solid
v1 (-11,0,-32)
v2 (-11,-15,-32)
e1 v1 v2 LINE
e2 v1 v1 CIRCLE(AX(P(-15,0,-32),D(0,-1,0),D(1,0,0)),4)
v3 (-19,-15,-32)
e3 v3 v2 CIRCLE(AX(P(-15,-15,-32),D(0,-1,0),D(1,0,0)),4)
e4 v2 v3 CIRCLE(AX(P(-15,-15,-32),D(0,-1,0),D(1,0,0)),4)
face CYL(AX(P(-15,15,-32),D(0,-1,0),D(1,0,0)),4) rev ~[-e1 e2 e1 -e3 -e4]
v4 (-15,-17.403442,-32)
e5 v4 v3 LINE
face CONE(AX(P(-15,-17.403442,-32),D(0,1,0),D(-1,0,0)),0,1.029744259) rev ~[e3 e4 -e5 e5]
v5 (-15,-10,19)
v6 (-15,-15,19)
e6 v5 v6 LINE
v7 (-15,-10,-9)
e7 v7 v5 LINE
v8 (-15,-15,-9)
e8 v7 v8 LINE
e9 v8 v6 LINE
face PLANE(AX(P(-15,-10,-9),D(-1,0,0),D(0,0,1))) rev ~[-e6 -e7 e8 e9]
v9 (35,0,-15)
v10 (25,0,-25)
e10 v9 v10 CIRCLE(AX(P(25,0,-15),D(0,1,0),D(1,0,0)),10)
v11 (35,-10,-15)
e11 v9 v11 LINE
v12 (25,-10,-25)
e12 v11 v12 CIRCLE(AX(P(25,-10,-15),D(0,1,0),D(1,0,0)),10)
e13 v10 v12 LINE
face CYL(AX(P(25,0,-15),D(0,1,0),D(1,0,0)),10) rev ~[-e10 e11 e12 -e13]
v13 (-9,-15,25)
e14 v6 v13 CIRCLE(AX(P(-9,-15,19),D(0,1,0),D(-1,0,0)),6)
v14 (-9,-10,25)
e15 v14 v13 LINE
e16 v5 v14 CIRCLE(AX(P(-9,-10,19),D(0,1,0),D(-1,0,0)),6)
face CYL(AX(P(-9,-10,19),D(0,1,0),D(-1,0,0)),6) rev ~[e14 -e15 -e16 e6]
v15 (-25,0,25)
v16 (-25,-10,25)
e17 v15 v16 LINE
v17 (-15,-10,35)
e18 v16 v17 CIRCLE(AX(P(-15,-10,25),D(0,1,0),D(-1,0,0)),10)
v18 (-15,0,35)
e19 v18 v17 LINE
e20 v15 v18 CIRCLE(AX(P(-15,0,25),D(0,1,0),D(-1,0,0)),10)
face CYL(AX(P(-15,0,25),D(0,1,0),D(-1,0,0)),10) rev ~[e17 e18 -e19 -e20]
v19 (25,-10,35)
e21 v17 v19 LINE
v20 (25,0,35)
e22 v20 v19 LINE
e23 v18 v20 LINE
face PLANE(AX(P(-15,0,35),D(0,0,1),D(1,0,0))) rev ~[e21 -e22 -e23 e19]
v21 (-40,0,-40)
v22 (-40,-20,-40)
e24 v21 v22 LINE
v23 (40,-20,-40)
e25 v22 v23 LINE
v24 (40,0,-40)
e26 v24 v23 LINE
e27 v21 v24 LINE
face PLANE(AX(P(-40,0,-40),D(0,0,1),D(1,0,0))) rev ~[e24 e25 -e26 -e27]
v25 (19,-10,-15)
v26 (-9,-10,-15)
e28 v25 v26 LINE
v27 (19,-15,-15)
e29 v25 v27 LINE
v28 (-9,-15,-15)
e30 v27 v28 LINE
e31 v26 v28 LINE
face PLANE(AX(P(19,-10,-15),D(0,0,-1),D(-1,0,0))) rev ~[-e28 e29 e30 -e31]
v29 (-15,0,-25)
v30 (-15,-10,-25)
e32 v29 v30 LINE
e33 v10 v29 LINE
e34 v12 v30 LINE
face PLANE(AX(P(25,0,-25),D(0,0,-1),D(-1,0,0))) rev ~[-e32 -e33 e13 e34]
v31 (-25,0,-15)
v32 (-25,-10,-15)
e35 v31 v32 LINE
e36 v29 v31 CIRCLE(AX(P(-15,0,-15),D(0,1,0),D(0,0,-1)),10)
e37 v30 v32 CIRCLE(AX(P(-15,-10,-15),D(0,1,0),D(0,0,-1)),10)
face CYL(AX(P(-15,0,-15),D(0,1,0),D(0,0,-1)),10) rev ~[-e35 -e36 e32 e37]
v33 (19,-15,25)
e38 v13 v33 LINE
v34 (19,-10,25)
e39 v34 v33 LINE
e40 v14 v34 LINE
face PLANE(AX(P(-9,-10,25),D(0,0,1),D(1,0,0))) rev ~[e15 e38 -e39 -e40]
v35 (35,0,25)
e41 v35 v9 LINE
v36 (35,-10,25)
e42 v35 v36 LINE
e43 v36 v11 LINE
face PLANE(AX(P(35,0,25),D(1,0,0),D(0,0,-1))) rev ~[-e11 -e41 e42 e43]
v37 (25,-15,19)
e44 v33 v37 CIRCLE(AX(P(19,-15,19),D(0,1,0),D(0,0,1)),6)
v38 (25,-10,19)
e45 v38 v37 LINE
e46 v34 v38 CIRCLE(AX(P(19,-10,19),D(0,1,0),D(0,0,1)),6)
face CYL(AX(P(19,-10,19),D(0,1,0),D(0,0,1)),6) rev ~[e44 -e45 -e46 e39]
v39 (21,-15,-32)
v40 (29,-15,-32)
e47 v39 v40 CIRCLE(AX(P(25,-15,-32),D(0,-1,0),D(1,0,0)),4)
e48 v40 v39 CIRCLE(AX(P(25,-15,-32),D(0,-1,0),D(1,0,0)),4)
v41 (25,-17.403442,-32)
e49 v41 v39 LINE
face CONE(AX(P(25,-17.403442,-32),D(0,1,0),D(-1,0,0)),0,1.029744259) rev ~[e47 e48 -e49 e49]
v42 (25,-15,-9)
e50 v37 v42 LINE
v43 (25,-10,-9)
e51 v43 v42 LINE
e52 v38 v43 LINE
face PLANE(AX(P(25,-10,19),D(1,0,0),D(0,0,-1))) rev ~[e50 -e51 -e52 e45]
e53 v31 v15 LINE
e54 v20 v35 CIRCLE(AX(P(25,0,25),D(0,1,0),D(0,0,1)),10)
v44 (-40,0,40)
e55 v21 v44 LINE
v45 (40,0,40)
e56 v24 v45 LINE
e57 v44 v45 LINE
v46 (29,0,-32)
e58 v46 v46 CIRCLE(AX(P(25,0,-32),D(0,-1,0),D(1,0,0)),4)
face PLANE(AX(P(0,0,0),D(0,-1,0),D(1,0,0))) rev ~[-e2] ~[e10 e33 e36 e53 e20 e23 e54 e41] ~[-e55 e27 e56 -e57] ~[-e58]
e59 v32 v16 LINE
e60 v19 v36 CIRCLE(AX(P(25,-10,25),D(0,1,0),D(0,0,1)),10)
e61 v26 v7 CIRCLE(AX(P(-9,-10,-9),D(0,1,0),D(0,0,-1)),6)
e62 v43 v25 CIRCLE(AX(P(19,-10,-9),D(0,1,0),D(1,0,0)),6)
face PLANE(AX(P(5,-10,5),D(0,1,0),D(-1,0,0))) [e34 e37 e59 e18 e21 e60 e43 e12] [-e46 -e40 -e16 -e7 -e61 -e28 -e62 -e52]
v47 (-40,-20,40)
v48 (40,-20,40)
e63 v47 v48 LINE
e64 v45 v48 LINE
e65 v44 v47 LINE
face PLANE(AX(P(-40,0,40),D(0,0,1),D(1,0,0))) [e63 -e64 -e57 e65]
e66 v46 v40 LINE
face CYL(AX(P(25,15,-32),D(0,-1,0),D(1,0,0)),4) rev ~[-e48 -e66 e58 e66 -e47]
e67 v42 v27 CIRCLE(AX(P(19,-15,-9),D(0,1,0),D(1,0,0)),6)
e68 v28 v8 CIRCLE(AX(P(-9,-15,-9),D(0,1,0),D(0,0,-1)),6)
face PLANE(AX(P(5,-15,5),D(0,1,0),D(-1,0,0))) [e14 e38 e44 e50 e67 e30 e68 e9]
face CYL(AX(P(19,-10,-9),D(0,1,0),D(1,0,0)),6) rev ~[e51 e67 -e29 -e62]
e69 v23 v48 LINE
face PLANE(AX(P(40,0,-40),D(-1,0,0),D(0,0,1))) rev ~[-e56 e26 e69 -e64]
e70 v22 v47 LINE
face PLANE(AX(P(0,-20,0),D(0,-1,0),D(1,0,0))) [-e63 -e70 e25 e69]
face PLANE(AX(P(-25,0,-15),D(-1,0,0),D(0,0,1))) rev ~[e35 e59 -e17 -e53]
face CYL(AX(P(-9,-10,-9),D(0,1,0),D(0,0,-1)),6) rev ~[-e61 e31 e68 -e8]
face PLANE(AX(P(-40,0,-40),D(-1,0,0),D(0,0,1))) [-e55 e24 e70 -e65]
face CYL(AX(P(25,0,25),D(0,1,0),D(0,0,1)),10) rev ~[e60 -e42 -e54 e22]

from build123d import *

# Parameters (mm, degrees)
F0_W     = 80
F0_H     = 80
F1_DEPTH = 20
F3_DEPTH = 10
F5_DEPTH = 5
F7_D     = 8
F7_DEPTH = 15
F7_TIP   = 2.4034424761


with BuildPart() as f1:
    # F0 (on Front) → F1 (new body)
    with BuildSketch(Plane.XZ):
        Rectangle(F0_W, F0_H)
    extrude(amount=F1_DEPTH)

    # F2 (on face) → F3 (cut)
    with BuildSketch(Plane(origin=(0, 0, 0), x_dir=(-1, 0, 0), z_dir=(0, 1, 0))):
        with BuildLine():
            ThreePointArc((-35, -15), (-32.0710678119, -22.0710678119), (-25, -25))
            Line((-25, -25), (15, -25))
            ThreePointArc((15, -25), (22.0710678119, -22.0710678119), (25, -15))
            Line((25, -15), (25, 25))
            ThreePointArc((25, 25), (22.0710678119, 32.0710678119), (15, 35))
            Line((15, 35), (-25, 35))
            ThreePointArc((-25, 35), (-32.0710678119, 32.0710678119), (-35, 25))
            Line((-35, 25), (-35, -15))
        make_face()
    extrude(amount=-F3_DEPTH, mode=Mode.SUBTRACT)

    # F4 (on face) → F5 (cut)
    with BuildSketch(Plane(origin=(0, -10, 0), x_dir=(-1, 0, 0), z_dir=(0, 1, 0))):
        with BuildLine():
            ThreePointArc((-25, -9), (-23.2426406871, -13.2426406871), (-19, -15))
            Line((-19, -15), (9, -15))
            ThreePointArc((9, -15), (13.2426406871, -13.2426406871), (15, -9))
            Line((15, -9), (15, 19))
            ThreePointArc((15, 19), (13.2426406871, 23.2426406871), (9, 25))
            Line((9, 25), (-19, 25))
            ThreePointArc((-19, 25), (-23.2426406871, 23.2426406871), (-25, 19))
            Line((-25, 19), (-25, -9))
        make_face()
    extrude(amount=-F5_DEPTH, mode=Mode.SUBTRACT)

    # F7
    with Locations(Plane(origin=(0, 0, 0), x_dir=(-1, 0, 0), z_dir=(0, 1, 0))):
        with Locations((-25, -32), (15, -32)):
            Hole(F7_D / 2, depth=F7_DEPTH)
            with Locations((0, 0, -(F7_DEPTH + F7_TIP / 2))):  # 118° drill point
                Cone(0, F7_D / 2, F7_TIP, mode=Mode.SUBTRACT)


solid = f1.part
